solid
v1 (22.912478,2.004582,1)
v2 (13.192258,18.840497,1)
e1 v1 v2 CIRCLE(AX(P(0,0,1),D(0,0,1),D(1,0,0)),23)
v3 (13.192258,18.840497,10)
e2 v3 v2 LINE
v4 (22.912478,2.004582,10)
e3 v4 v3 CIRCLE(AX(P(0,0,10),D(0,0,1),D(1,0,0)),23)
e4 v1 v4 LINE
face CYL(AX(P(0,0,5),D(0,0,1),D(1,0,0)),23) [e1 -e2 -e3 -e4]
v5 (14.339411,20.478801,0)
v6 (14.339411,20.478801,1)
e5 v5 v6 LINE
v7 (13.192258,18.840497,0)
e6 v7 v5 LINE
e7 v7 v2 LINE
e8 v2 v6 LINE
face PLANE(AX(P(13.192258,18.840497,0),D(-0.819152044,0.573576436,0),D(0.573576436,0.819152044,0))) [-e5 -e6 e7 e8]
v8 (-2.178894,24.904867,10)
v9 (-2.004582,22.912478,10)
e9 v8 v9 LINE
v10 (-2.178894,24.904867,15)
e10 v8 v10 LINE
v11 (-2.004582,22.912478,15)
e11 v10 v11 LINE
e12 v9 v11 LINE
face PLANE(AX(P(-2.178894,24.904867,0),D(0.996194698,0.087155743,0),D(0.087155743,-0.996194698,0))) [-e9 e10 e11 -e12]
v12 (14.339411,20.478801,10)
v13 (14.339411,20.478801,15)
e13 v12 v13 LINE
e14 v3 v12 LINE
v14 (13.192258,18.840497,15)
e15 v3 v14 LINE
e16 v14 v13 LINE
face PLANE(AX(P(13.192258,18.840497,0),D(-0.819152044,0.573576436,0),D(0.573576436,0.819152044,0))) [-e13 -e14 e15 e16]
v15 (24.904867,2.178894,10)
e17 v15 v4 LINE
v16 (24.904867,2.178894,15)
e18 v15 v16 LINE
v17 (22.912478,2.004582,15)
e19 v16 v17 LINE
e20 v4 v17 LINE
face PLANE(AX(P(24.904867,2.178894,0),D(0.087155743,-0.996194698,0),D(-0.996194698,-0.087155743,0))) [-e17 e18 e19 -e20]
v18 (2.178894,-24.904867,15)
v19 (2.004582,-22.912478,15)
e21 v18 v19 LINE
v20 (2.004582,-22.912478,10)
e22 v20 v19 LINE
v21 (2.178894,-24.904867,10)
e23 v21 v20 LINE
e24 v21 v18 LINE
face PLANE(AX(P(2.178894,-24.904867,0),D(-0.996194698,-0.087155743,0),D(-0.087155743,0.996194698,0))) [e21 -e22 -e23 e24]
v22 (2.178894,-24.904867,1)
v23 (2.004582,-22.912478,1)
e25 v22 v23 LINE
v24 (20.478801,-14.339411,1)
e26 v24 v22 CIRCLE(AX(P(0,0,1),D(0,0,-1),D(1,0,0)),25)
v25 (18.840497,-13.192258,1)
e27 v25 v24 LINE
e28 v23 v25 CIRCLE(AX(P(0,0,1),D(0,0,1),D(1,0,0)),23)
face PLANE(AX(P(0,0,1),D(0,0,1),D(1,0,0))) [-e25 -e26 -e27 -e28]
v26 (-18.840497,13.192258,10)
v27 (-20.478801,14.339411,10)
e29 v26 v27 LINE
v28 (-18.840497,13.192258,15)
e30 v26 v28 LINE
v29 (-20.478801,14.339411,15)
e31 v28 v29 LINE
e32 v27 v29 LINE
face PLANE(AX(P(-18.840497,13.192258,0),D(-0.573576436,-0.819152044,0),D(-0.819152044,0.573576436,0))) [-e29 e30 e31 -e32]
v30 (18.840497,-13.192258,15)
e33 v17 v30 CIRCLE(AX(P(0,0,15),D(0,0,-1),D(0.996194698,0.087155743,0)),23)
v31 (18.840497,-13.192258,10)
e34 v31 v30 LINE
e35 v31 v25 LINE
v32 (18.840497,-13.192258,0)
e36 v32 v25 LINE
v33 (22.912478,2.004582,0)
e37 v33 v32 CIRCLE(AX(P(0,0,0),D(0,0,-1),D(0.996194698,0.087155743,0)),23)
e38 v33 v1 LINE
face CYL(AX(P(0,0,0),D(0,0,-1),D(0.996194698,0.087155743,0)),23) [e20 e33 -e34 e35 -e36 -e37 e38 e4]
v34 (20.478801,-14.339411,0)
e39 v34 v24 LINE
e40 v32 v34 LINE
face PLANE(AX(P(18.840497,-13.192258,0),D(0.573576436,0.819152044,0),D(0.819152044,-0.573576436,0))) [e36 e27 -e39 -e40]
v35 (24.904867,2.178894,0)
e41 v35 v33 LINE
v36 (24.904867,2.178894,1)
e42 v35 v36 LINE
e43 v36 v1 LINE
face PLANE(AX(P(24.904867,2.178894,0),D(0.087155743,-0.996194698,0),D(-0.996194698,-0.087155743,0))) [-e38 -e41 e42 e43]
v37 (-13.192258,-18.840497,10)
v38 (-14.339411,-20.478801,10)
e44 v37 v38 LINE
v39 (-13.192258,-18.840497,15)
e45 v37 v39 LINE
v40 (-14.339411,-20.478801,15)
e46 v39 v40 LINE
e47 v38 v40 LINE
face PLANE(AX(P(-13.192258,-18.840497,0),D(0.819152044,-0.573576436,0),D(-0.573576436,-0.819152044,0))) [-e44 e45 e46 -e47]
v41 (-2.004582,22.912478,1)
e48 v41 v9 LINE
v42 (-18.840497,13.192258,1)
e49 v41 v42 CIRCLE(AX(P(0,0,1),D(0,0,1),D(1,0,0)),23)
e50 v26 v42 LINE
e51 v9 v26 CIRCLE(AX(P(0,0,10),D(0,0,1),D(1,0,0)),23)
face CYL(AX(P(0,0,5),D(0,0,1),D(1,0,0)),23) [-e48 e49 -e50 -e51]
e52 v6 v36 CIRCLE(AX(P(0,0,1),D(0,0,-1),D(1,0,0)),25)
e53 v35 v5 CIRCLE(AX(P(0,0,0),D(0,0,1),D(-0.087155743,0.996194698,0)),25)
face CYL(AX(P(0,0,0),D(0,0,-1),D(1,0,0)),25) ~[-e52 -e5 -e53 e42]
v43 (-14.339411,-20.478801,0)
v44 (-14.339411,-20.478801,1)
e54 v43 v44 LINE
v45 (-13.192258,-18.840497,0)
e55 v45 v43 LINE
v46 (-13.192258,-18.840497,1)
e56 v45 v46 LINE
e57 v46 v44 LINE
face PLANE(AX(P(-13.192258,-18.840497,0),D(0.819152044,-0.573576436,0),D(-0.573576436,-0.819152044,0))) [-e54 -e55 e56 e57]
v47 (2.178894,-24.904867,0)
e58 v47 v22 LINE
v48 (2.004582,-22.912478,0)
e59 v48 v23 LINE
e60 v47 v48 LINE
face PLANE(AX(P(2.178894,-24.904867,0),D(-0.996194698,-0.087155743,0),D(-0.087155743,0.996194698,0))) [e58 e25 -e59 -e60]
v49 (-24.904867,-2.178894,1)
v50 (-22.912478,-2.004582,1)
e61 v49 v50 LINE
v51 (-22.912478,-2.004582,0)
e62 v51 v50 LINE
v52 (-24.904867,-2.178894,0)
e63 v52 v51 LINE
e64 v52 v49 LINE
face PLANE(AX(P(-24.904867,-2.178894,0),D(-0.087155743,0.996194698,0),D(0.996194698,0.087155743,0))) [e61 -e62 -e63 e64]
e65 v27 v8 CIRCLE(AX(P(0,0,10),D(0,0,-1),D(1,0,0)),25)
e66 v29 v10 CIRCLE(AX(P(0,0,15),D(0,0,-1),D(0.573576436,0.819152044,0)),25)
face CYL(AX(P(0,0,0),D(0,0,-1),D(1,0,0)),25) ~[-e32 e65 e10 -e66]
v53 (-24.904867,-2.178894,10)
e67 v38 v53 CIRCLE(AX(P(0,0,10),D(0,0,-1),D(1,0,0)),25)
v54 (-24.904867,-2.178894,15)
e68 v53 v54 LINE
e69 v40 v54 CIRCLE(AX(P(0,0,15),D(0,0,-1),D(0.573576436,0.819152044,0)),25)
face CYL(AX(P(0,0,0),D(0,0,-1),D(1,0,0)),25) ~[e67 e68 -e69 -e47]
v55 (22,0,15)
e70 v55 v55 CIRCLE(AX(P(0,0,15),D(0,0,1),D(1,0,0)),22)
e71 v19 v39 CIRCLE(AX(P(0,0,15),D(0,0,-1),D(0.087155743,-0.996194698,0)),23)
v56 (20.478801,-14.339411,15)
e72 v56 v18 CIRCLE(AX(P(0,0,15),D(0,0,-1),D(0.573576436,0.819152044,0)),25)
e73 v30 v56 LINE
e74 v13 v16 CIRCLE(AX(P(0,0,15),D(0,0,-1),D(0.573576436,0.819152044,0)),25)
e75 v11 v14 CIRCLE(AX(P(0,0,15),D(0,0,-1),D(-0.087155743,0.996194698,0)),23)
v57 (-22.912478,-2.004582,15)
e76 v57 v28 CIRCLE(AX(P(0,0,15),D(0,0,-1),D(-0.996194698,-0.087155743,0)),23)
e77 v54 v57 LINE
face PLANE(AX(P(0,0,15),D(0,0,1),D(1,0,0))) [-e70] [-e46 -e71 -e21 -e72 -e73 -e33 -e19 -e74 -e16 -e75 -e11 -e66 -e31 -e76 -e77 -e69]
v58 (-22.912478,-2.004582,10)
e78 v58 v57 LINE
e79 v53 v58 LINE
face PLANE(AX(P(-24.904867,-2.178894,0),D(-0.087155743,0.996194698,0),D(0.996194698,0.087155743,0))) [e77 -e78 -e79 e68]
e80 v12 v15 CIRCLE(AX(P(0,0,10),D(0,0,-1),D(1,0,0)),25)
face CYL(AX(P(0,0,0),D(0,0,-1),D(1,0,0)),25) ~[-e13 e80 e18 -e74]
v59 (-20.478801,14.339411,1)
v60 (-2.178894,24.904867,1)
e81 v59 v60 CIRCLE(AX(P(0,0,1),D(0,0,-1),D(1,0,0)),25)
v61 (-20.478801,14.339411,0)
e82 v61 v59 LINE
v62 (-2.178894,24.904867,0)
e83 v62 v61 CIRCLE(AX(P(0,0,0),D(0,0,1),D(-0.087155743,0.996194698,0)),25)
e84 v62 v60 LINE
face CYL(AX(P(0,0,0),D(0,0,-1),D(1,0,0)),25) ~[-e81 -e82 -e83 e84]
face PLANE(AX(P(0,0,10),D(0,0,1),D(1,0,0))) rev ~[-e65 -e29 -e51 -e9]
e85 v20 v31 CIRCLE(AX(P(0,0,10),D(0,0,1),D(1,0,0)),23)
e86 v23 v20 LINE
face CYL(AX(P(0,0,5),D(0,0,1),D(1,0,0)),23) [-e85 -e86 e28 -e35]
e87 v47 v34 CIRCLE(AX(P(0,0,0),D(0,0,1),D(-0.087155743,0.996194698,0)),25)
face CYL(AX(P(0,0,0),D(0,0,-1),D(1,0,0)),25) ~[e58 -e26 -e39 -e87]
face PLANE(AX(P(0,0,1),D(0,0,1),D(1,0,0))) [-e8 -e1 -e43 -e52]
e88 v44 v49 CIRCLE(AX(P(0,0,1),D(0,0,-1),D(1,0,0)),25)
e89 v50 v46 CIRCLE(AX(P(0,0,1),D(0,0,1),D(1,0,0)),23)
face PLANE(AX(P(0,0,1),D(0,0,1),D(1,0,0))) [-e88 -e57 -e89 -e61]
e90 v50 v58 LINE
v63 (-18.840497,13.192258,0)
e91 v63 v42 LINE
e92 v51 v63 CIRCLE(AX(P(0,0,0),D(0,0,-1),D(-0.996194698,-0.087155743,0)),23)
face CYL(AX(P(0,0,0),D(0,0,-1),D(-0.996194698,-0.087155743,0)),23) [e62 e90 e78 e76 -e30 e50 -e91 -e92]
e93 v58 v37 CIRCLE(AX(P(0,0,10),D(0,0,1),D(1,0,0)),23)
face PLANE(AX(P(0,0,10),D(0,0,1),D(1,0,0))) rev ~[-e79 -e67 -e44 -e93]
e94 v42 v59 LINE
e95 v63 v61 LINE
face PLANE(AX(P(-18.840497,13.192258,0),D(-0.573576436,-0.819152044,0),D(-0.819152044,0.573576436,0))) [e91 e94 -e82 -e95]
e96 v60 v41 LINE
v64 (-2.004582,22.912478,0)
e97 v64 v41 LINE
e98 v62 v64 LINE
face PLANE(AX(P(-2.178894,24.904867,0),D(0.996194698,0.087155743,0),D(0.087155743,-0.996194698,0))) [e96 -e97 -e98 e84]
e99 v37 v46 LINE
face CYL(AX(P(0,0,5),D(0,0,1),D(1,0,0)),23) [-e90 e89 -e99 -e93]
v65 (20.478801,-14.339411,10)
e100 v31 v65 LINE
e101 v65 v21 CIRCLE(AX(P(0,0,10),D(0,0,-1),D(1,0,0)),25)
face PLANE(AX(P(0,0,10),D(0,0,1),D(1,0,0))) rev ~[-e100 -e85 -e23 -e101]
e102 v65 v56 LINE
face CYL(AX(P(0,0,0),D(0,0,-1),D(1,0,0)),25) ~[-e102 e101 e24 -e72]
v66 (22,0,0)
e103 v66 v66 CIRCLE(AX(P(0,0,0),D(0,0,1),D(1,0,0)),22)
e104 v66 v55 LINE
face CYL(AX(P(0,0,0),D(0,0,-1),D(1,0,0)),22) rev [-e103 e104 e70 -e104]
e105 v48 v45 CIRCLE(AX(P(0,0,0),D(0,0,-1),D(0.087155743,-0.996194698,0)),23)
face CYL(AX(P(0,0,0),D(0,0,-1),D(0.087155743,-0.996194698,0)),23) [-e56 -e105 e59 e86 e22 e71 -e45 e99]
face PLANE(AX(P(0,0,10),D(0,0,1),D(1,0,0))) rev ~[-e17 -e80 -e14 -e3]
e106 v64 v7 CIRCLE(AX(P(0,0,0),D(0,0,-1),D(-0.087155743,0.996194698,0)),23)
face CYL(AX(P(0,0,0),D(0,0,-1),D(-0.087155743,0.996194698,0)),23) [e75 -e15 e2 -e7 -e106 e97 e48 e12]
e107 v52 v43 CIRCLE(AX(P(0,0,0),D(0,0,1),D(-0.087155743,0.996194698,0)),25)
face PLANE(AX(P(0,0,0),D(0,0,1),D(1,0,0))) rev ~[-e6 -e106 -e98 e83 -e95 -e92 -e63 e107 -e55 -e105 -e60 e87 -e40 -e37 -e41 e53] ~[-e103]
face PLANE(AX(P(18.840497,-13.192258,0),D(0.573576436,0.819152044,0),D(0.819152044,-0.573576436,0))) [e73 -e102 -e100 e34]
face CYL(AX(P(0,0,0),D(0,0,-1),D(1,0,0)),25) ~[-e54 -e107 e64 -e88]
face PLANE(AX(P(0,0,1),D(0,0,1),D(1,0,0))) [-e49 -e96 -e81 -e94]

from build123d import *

# Parameters (mm, degrees)
F0_R            = 25
F0_R_2          = 22
F1_DEPTH        = 15
F3_DEPTH        = 15
F3_COPIES_COUNT = 4
F5_R            = 38.565863123
F5_R_2          = 23
F6_DEPTH        = 2.5
F7_R            = 30.9780307995
F7_R_2          = 23
F8_DEPTH        = 4


# Not quite as in the source:
# - a pattern or mirror of a feature is missing from the dataset's text; its kind, count and spacing are read off the source's solid


with BuildPart() as f1:
    # F0 (on Top) → F1 (new body)
    with BuildSketch(Plane.XY):
        Circle(F0_R)
        Circle(F0_R_2, mode=Mode.SUBTRACT)
    extrude(amount=F1_DEPTH)

    # F2 (on Top) → F3 (cut, through all)
    with BuildSketch(Plane.XY):
        with BuildLine():
            Line((13.1922580361, 18.8404970186), (14.3394109088, 20.4788011072))
            ThreePointArc((14.3394109088, 20.4788011072), (6.4704761276, 24.1481456572), (-2.1788935687, 24.9048674523))
            Line((-2.1788935687, 24.9048674523), (-2.0045820832, 22.9124780561))
            ThreePointArc((-2.0045820832, 22.9124780561), (5.9528380374, 22.2162940046), (13.1922580361, 18.8404970186))
        make_face()
    f3 = extrude(amount=F3_DEPTH, mode=Mode.SUBTRACT)

    # F3_copies: F3 ×4 about axis
    f3_copies_axis = Axis((0, 0, 0), (0, 0, 1))
    for i in range(1, F3_COPIES_COUNT):
        add(f3.rotate(f3_copies_axis, i * 360 / F3_COPIES_COUNT), mode=Mode.SUBTRACT)

    # F5 (on offset) → F6 (cut, symmetric)
    with BuildSketch(Plane.XY.offset(7.5)):
        Circle(F5_R)
        Circle(F5_R_2, mode=Mode.SUBTRACT)
    extrude(amount=F6_DEPTH, both=True, mode=Mode.SUBTRACT)

    # F7 (on face) → F8 (cut)
    with BuildSketch(Plane.XY.offset(5)):
        Circle(F7_R)
        Circle(F7_R_2, mode=Mode.SUBTRACT)
    extrude(amount=-F8_DEPTH, mode=Mode.SUBTRACT)


solid = f1.part
